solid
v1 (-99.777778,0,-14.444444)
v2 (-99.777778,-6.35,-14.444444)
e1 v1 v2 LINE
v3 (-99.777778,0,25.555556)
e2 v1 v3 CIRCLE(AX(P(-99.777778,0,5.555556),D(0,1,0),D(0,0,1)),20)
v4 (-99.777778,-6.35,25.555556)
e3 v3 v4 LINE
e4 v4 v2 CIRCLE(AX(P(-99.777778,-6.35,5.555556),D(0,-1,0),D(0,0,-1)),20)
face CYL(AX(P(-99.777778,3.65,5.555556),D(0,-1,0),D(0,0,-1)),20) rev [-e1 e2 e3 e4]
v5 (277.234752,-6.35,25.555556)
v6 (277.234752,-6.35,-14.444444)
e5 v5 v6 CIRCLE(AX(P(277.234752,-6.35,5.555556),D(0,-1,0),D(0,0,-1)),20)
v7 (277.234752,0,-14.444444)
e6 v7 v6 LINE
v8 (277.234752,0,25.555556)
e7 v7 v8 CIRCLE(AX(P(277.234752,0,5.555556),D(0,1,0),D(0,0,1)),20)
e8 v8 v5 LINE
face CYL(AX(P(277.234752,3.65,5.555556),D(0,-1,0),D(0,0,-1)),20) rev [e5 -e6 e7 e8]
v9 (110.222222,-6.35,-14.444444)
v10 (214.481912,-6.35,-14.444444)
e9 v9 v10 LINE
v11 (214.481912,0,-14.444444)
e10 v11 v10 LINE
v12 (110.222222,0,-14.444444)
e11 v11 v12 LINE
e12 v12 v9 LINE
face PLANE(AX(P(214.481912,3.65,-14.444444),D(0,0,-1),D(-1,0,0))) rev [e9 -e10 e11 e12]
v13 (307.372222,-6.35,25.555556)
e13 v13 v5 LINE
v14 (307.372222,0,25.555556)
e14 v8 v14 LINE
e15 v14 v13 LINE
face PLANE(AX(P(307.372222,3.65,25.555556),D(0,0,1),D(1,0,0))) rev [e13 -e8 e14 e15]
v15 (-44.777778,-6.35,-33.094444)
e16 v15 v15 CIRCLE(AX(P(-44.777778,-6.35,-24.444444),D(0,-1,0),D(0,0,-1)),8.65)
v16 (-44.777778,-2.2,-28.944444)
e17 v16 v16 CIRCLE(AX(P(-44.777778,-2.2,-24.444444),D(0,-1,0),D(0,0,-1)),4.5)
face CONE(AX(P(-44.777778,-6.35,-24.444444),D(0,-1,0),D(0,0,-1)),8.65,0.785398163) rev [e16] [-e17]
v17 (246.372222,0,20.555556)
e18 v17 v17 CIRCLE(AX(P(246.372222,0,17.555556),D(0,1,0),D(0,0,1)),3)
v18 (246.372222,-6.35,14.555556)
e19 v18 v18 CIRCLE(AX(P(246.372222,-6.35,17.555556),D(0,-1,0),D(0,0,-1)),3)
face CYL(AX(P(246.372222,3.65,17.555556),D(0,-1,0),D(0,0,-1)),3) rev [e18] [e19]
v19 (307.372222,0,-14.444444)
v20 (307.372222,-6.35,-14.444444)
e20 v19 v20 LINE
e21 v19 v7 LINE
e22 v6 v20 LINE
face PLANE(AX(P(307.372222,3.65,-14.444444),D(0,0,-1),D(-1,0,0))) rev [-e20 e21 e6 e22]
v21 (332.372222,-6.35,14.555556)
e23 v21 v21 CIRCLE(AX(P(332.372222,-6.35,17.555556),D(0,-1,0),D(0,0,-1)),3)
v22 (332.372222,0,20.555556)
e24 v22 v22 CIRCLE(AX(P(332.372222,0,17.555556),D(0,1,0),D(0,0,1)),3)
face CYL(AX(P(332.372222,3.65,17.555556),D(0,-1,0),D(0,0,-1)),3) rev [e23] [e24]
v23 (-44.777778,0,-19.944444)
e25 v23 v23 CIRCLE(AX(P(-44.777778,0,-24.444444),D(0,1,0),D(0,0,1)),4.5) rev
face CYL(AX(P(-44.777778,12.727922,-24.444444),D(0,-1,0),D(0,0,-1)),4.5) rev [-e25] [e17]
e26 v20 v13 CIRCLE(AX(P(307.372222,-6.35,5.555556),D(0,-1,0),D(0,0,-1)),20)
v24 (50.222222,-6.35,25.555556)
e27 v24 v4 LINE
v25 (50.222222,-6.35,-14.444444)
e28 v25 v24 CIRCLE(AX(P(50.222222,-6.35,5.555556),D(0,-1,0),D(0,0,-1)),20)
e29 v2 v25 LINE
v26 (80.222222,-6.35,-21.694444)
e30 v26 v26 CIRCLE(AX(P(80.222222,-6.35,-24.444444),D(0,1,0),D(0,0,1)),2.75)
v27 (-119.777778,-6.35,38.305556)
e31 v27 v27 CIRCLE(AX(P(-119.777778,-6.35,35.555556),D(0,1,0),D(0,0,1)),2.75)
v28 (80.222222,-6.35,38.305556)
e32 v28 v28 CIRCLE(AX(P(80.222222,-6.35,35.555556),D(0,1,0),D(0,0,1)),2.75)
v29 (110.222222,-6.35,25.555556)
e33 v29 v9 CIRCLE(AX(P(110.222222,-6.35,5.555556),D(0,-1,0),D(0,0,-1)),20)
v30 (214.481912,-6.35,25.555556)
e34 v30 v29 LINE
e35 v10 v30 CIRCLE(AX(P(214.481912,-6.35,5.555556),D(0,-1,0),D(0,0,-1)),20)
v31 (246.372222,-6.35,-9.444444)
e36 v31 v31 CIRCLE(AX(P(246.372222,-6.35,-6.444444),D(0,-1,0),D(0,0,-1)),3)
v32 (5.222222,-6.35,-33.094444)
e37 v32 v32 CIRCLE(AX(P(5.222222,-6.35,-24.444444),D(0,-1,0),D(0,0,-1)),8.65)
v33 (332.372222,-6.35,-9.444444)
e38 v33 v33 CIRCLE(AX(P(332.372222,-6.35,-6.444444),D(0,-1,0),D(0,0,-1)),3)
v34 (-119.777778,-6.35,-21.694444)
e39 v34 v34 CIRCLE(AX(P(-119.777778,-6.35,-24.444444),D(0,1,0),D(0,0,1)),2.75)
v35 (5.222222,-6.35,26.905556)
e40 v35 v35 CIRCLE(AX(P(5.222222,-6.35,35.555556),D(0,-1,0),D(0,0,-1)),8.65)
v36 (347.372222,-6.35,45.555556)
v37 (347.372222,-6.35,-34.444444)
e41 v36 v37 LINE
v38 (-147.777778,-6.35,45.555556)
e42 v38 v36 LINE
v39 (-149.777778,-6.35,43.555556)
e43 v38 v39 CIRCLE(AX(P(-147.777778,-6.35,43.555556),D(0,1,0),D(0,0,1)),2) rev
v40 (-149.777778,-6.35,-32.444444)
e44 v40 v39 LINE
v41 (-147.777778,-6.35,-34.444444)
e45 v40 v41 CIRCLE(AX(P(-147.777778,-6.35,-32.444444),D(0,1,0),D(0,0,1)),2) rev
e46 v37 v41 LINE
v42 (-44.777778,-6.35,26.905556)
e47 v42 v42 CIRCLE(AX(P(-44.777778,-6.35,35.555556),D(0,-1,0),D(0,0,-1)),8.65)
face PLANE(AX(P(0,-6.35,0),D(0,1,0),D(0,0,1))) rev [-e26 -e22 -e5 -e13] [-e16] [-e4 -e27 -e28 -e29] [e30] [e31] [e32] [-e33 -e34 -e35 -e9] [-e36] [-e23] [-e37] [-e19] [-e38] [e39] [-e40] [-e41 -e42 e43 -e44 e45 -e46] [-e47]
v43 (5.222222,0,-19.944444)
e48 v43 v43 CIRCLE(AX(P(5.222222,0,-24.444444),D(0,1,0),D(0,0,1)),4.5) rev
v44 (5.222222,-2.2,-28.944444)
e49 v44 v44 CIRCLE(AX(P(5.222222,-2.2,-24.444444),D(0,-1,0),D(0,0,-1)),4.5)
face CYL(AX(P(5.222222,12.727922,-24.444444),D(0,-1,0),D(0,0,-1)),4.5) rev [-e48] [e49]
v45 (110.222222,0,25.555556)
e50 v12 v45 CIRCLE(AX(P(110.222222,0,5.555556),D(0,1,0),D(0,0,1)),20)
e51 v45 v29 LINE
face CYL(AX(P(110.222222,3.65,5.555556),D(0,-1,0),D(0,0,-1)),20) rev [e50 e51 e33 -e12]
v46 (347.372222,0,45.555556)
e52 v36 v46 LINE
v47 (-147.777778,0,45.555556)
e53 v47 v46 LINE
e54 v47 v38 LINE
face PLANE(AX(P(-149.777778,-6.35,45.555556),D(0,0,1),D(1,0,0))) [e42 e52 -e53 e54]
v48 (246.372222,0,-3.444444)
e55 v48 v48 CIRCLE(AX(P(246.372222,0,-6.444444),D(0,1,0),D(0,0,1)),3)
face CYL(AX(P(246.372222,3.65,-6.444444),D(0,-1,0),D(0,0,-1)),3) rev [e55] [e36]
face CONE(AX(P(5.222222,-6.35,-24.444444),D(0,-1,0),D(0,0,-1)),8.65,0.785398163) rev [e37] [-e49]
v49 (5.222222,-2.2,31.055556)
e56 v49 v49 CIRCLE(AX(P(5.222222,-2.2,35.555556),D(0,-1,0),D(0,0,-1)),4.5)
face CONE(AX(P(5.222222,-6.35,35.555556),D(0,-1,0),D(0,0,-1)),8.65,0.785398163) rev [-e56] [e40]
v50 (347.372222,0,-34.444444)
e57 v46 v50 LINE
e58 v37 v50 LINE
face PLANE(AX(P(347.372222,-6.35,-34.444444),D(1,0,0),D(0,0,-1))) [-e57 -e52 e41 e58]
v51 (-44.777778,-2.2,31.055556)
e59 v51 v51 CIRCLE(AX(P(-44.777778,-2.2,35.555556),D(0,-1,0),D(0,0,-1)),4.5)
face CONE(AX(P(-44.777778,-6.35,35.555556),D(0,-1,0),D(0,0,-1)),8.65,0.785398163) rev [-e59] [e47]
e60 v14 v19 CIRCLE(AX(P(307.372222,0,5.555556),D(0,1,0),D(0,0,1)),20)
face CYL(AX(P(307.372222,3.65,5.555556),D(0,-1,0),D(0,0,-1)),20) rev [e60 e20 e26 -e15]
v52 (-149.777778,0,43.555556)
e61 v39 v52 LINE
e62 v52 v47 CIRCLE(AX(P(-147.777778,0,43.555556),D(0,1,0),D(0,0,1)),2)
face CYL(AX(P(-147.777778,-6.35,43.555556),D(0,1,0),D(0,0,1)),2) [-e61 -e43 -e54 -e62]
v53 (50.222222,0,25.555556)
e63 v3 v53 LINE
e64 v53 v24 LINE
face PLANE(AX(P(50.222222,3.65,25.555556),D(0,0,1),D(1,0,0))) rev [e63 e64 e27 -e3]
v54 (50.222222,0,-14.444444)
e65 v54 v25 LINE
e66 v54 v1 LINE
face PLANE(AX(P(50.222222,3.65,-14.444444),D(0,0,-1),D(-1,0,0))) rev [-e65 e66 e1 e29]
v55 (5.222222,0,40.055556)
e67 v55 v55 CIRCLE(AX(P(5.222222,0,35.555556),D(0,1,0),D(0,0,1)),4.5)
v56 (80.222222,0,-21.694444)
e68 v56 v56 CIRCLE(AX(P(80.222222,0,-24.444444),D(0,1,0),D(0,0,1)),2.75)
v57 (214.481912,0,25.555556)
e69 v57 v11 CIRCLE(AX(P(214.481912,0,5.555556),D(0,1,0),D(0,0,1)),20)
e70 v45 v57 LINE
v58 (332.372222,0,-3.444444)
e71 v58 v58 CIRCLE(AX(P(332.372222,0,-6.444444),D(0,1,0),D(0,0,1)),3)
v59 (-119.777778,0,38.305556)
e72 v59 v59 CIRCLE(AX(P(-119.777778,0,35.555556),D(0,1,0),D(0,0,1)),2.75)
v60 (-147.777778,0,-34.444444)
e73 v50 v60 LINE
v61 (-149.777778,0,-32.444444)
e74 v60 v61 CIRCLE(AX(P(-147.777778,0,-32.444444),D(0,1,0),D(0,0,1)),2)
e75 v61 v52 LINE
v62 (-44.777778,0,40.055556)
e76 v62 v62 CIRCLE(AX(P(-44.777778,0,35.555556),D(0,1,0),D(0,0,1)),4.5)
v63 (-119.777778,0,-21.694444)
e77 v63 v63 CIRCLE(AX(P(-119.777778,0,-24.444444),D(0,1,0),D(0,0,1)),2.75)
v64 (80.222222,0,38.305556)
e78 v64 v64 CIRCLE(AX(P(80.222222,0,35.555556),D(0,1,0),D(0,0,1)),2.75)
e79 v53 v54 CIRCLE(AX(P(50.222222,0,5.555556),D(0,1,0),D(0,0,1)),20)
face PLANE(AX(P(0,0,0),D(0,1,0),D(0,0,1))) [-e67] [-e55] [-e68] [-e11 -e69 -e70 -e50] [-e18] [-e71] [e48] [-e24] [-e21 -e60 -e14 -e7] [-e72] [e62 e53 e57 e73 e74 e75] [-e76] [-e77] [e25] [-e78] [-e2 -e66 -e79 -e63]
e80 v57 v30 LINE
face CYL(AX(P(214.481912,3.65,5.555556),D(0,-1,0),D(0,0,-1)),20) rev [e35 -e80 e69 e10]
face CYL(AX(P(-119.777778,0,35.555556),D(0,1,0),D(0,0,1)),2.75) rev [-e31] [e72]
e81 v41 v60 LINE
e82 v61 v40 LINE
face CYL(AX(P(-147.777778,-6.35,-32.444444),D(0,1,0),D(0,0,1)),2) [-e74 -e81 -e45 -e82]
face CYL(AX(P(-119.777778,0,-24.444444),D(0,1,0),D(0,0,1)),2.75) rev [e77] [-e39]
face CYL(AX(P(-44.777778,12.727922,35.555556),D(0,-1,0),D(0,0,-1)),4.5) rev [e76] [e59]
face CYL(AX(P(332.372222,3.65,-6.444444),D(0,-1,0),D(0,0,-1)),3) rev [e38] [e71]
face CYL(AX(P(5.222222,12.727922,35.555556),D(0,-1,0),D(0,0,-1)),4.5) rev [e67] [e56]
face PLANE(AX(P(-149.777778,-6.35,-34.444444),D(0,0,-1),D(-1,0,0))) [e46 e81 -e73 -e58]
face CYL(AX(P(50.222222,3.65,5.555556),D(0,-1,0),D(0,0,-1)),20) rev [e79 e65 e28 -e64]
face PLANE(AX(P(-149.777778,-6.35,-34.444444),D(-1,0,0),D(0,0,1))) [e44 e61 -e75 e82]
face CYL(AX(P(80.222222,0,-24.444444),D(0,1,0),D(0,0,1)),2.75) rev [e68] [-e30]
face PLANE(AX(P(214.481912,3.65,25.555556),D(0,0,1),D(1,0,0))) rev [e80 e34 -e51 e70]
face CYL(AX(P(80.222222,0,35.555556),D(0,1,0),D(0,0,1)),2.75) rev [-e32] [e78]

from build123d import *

# Parameters (mm, degrees)
CROQUIS1_W                                      = 497.15
CROQUIS1_H                                      = 80
BRIDA_BASE1_DEPTH                               = 6.35
REDONDEO1_R                                     = 2
TALADRO_DE_MARGEN_PARA_M51_D                    = 5.5
CORTAR_EXTRUIR1_DEPTH                           = 10
CROQUIS10_R                                     = 3
CORTAR_EXTRUIR2_DEPTH                           = 10
SKETCH1_R                                       = 4.5
CUT_EXTRUDE1_DEPTH                              = 6.35
CSK_FOR_M8_OVAL_HEAD_MACHINE_SCREW1_D           = 9
CSK_FOR_M8_OVAL_HEAD_MACHINE_SCREW1_DEPTH       = 6.349
CSK_FOR_M8_OVAL_HEAD_MACHINE_SCREW1_CSINK_D     = 17.3
CSK_FOR_M8_OVAL_HEAD_MACHINE_SCREW1_CSINK_ANGLE = 90
CSK_FOR_M8_OVAL_HEAD_MACHINE_SCREW1_TIP         = 2.703872786


# Sheet-metal steps are written as plain solids
with BuildPart() as part:
    # Croquis1 → Brida base1 (new body)
    with BuildSketch(Plane(origin=(0, 0, 0), x_dir=(1, 0, 0), z_dir=(0, 1, 0))):
        with Locations((98.797222222, -5.555555556)):
            Rectangle(CROQUIS1_W, CROQUIS1_H)
    extrude(amount=-BRIDA_BASE1_DEPTH)

    # Redondeo1
    redondeo1_edges = [part.edges().sort_by_distance(p)[0] for p in [
        (-149.777777778, -3.175, -34.444444444),
        (-149.777777778, -3.175, 45.555555556),
    ]]
    fillet(redondeo1_edges, radius=REDONDEO1_R)

    # Taladro de margen para M51 (through all)
    with Locations(Plane(origin=(0, 0, 0), x_dir=(1, 0, 0), z_dir=(0, 1, 0))):
        with Locations((-119.777777778, 24.444444444), (-119.777777778, -35.555555556), (80.222222222, -35.555555556), (80.222222222, 24.444444444)):
            Hole(TALADRO_DE_MARGEN_PARA_M51_D / 2)

    # Croquis9 → Cortar-Extruir1 (cut)
    with BuildSketch(Plane(origin=(0, -6.35, 0), x_dir=(-1, 0, 0), z_dir=(0, -1, 0))):
        with BuildLine():
            Line((-307.372222222, 14.444444444), (-277.234752083, 14.444444444))
            ThreePointArc((-277.234752083, 14.444444444), (-257.234752083, -5.555555556), (-277.234752083, -25.555555556))
            Line((-277.234752083, -25.555555556), (-307.372222222, -25.555555556))
            ThreePointArc((-307.372222222, -25.555555556), (-327.372222222, -5.555555556), (-307.372222222, 14.444444444))
        make_face()
        with BuildLine():
            Line((-50.222222222, 14.444444444), (99.777777778, 14.444444444))
            ThreePointArc((99.777777778, 14.444444444), (119.777777778, -5.555555556), (99.777777778, -25.555555556))
            Line((99.777777778, -25.555555556), (-50.222222222, -25.555555556))
            ThreePointArc((-50.222222222, -25.555555556), (-70.222222222, -5.555555556), (-50.222222222, 14.444444444))
        make_face()
        with BuildLine():
            Line((-214.481912447, 14.444444444), (-110.222222222, 14.444444444))
            ThreePointArc((-110.222222222, 14.444444444), (-90.222222222, -5.555555556), (-110.222222222, -25.555555556))
            Line((-110.222222222, -25.555555556), (-214.481912447, -25.555555556))
            ThreePointArc((-214.481912447, -25.555555556), (-234.481912447, -5.555555556), (-214.481912447, 14.444444444))
        make_face()
    extrude(amount=-CORTAR_EXTRUIR1_DEPTH, mode=Mode.SUBTRACT)

    # Croquis10 → Cortar-Extruir2 (cut)
    with BuildSketch(Plane.XZ.offset(6.35)):
        with Locations(Location((332.372222222, 17.555555556, 0), (0, 0, 270))):
            Circle(CROQUIS10_R)
        with Locations(Location((246.372222222, 17.555555556, 0), (0, 0, 270))):
            Circle(CROQUIS10_R)
        with Locations(Location((246.372222222, -6.444444444, 0), (0, 0, 270))):
            Circle(CROQUIS10_R)
        with Locations(Location((332.372222222, -6.444444444, 0), (0, 0, 270))):
            Circle(CROQUIS10_R)
    extrude(amount=-CORTAR_EXTRUIR2_DEPTH, mode=Mode.SUBTRACT)

    # Sketch1 → Cut-Extrude1 (cut)
    with BuildSketch(Plane.XZ.offset(6.35)):
        with Locations(Location((-44.777777778, -24.444444444, 0), (0, 0, 270))):
            Circle(SKETCH1_R)
        with Locations(Location((5.222222222, -24.444444444, 0), (0, 0, 270))):
            Circle(SKETCH1_R)
        with Locations(Location((5.222222222, 35.555555556, 0), (0, 0, 270))):
            Circle(SKETCH1_R)
        with Locations(Location((-44.777777778, 35.555555556, 0), (0, 0, 90))):
            Circle(SKETCH1_R)
    extrude(amount=-CUT_EXTRUDE1_DEPTH, mode=Mode.SUBTRACT)

    # CSK for M8 Oval Head Machine Screw1
    with Locations(Plane(origin=(5.222222222, -6.35, 35.555555556), x_dir=(0, 0, -1), z_dir=(0, -1, 0))):
        with Locations((0, 0), (0, -50), (60, -50), (60, 0)):
            CounterSinkHole(CSK_FOR_M8_OVAL_HEAD_MACHINE_SCREW1_D / 2, CSK_FOR_M8_OVAL_HEAD_MACHINE_SCREW1_CSINK_D / 2, depth=CSK_FOR_M8_OVAL_HEAD_MACHINE_SCREW1_DEPTH, counter_sink_angle=CSK_FOR_M8_OVAL_HEAD_MACHINE_SCREW1_CSINK_ANGLE)
            with Locations((0, 0, -(CSK_FOR_M8_OVAL_HEAD_MACHINE_SCREW1_DEPTH + CSK_FOR_M8_OVAL_HEAD_MACHINE_SCREW1_TIP / 2))):  # 118° drill point
                Cone(0, CSK_FOR_M8_OVAL_HEAD_MACHINE_SCREW1_D / 2, CSK_FOR_M8_OVAL_HEAD_MACHINE_SCREW1_TIP, mode=Mode.SUBTRACT)


solid = part.part
